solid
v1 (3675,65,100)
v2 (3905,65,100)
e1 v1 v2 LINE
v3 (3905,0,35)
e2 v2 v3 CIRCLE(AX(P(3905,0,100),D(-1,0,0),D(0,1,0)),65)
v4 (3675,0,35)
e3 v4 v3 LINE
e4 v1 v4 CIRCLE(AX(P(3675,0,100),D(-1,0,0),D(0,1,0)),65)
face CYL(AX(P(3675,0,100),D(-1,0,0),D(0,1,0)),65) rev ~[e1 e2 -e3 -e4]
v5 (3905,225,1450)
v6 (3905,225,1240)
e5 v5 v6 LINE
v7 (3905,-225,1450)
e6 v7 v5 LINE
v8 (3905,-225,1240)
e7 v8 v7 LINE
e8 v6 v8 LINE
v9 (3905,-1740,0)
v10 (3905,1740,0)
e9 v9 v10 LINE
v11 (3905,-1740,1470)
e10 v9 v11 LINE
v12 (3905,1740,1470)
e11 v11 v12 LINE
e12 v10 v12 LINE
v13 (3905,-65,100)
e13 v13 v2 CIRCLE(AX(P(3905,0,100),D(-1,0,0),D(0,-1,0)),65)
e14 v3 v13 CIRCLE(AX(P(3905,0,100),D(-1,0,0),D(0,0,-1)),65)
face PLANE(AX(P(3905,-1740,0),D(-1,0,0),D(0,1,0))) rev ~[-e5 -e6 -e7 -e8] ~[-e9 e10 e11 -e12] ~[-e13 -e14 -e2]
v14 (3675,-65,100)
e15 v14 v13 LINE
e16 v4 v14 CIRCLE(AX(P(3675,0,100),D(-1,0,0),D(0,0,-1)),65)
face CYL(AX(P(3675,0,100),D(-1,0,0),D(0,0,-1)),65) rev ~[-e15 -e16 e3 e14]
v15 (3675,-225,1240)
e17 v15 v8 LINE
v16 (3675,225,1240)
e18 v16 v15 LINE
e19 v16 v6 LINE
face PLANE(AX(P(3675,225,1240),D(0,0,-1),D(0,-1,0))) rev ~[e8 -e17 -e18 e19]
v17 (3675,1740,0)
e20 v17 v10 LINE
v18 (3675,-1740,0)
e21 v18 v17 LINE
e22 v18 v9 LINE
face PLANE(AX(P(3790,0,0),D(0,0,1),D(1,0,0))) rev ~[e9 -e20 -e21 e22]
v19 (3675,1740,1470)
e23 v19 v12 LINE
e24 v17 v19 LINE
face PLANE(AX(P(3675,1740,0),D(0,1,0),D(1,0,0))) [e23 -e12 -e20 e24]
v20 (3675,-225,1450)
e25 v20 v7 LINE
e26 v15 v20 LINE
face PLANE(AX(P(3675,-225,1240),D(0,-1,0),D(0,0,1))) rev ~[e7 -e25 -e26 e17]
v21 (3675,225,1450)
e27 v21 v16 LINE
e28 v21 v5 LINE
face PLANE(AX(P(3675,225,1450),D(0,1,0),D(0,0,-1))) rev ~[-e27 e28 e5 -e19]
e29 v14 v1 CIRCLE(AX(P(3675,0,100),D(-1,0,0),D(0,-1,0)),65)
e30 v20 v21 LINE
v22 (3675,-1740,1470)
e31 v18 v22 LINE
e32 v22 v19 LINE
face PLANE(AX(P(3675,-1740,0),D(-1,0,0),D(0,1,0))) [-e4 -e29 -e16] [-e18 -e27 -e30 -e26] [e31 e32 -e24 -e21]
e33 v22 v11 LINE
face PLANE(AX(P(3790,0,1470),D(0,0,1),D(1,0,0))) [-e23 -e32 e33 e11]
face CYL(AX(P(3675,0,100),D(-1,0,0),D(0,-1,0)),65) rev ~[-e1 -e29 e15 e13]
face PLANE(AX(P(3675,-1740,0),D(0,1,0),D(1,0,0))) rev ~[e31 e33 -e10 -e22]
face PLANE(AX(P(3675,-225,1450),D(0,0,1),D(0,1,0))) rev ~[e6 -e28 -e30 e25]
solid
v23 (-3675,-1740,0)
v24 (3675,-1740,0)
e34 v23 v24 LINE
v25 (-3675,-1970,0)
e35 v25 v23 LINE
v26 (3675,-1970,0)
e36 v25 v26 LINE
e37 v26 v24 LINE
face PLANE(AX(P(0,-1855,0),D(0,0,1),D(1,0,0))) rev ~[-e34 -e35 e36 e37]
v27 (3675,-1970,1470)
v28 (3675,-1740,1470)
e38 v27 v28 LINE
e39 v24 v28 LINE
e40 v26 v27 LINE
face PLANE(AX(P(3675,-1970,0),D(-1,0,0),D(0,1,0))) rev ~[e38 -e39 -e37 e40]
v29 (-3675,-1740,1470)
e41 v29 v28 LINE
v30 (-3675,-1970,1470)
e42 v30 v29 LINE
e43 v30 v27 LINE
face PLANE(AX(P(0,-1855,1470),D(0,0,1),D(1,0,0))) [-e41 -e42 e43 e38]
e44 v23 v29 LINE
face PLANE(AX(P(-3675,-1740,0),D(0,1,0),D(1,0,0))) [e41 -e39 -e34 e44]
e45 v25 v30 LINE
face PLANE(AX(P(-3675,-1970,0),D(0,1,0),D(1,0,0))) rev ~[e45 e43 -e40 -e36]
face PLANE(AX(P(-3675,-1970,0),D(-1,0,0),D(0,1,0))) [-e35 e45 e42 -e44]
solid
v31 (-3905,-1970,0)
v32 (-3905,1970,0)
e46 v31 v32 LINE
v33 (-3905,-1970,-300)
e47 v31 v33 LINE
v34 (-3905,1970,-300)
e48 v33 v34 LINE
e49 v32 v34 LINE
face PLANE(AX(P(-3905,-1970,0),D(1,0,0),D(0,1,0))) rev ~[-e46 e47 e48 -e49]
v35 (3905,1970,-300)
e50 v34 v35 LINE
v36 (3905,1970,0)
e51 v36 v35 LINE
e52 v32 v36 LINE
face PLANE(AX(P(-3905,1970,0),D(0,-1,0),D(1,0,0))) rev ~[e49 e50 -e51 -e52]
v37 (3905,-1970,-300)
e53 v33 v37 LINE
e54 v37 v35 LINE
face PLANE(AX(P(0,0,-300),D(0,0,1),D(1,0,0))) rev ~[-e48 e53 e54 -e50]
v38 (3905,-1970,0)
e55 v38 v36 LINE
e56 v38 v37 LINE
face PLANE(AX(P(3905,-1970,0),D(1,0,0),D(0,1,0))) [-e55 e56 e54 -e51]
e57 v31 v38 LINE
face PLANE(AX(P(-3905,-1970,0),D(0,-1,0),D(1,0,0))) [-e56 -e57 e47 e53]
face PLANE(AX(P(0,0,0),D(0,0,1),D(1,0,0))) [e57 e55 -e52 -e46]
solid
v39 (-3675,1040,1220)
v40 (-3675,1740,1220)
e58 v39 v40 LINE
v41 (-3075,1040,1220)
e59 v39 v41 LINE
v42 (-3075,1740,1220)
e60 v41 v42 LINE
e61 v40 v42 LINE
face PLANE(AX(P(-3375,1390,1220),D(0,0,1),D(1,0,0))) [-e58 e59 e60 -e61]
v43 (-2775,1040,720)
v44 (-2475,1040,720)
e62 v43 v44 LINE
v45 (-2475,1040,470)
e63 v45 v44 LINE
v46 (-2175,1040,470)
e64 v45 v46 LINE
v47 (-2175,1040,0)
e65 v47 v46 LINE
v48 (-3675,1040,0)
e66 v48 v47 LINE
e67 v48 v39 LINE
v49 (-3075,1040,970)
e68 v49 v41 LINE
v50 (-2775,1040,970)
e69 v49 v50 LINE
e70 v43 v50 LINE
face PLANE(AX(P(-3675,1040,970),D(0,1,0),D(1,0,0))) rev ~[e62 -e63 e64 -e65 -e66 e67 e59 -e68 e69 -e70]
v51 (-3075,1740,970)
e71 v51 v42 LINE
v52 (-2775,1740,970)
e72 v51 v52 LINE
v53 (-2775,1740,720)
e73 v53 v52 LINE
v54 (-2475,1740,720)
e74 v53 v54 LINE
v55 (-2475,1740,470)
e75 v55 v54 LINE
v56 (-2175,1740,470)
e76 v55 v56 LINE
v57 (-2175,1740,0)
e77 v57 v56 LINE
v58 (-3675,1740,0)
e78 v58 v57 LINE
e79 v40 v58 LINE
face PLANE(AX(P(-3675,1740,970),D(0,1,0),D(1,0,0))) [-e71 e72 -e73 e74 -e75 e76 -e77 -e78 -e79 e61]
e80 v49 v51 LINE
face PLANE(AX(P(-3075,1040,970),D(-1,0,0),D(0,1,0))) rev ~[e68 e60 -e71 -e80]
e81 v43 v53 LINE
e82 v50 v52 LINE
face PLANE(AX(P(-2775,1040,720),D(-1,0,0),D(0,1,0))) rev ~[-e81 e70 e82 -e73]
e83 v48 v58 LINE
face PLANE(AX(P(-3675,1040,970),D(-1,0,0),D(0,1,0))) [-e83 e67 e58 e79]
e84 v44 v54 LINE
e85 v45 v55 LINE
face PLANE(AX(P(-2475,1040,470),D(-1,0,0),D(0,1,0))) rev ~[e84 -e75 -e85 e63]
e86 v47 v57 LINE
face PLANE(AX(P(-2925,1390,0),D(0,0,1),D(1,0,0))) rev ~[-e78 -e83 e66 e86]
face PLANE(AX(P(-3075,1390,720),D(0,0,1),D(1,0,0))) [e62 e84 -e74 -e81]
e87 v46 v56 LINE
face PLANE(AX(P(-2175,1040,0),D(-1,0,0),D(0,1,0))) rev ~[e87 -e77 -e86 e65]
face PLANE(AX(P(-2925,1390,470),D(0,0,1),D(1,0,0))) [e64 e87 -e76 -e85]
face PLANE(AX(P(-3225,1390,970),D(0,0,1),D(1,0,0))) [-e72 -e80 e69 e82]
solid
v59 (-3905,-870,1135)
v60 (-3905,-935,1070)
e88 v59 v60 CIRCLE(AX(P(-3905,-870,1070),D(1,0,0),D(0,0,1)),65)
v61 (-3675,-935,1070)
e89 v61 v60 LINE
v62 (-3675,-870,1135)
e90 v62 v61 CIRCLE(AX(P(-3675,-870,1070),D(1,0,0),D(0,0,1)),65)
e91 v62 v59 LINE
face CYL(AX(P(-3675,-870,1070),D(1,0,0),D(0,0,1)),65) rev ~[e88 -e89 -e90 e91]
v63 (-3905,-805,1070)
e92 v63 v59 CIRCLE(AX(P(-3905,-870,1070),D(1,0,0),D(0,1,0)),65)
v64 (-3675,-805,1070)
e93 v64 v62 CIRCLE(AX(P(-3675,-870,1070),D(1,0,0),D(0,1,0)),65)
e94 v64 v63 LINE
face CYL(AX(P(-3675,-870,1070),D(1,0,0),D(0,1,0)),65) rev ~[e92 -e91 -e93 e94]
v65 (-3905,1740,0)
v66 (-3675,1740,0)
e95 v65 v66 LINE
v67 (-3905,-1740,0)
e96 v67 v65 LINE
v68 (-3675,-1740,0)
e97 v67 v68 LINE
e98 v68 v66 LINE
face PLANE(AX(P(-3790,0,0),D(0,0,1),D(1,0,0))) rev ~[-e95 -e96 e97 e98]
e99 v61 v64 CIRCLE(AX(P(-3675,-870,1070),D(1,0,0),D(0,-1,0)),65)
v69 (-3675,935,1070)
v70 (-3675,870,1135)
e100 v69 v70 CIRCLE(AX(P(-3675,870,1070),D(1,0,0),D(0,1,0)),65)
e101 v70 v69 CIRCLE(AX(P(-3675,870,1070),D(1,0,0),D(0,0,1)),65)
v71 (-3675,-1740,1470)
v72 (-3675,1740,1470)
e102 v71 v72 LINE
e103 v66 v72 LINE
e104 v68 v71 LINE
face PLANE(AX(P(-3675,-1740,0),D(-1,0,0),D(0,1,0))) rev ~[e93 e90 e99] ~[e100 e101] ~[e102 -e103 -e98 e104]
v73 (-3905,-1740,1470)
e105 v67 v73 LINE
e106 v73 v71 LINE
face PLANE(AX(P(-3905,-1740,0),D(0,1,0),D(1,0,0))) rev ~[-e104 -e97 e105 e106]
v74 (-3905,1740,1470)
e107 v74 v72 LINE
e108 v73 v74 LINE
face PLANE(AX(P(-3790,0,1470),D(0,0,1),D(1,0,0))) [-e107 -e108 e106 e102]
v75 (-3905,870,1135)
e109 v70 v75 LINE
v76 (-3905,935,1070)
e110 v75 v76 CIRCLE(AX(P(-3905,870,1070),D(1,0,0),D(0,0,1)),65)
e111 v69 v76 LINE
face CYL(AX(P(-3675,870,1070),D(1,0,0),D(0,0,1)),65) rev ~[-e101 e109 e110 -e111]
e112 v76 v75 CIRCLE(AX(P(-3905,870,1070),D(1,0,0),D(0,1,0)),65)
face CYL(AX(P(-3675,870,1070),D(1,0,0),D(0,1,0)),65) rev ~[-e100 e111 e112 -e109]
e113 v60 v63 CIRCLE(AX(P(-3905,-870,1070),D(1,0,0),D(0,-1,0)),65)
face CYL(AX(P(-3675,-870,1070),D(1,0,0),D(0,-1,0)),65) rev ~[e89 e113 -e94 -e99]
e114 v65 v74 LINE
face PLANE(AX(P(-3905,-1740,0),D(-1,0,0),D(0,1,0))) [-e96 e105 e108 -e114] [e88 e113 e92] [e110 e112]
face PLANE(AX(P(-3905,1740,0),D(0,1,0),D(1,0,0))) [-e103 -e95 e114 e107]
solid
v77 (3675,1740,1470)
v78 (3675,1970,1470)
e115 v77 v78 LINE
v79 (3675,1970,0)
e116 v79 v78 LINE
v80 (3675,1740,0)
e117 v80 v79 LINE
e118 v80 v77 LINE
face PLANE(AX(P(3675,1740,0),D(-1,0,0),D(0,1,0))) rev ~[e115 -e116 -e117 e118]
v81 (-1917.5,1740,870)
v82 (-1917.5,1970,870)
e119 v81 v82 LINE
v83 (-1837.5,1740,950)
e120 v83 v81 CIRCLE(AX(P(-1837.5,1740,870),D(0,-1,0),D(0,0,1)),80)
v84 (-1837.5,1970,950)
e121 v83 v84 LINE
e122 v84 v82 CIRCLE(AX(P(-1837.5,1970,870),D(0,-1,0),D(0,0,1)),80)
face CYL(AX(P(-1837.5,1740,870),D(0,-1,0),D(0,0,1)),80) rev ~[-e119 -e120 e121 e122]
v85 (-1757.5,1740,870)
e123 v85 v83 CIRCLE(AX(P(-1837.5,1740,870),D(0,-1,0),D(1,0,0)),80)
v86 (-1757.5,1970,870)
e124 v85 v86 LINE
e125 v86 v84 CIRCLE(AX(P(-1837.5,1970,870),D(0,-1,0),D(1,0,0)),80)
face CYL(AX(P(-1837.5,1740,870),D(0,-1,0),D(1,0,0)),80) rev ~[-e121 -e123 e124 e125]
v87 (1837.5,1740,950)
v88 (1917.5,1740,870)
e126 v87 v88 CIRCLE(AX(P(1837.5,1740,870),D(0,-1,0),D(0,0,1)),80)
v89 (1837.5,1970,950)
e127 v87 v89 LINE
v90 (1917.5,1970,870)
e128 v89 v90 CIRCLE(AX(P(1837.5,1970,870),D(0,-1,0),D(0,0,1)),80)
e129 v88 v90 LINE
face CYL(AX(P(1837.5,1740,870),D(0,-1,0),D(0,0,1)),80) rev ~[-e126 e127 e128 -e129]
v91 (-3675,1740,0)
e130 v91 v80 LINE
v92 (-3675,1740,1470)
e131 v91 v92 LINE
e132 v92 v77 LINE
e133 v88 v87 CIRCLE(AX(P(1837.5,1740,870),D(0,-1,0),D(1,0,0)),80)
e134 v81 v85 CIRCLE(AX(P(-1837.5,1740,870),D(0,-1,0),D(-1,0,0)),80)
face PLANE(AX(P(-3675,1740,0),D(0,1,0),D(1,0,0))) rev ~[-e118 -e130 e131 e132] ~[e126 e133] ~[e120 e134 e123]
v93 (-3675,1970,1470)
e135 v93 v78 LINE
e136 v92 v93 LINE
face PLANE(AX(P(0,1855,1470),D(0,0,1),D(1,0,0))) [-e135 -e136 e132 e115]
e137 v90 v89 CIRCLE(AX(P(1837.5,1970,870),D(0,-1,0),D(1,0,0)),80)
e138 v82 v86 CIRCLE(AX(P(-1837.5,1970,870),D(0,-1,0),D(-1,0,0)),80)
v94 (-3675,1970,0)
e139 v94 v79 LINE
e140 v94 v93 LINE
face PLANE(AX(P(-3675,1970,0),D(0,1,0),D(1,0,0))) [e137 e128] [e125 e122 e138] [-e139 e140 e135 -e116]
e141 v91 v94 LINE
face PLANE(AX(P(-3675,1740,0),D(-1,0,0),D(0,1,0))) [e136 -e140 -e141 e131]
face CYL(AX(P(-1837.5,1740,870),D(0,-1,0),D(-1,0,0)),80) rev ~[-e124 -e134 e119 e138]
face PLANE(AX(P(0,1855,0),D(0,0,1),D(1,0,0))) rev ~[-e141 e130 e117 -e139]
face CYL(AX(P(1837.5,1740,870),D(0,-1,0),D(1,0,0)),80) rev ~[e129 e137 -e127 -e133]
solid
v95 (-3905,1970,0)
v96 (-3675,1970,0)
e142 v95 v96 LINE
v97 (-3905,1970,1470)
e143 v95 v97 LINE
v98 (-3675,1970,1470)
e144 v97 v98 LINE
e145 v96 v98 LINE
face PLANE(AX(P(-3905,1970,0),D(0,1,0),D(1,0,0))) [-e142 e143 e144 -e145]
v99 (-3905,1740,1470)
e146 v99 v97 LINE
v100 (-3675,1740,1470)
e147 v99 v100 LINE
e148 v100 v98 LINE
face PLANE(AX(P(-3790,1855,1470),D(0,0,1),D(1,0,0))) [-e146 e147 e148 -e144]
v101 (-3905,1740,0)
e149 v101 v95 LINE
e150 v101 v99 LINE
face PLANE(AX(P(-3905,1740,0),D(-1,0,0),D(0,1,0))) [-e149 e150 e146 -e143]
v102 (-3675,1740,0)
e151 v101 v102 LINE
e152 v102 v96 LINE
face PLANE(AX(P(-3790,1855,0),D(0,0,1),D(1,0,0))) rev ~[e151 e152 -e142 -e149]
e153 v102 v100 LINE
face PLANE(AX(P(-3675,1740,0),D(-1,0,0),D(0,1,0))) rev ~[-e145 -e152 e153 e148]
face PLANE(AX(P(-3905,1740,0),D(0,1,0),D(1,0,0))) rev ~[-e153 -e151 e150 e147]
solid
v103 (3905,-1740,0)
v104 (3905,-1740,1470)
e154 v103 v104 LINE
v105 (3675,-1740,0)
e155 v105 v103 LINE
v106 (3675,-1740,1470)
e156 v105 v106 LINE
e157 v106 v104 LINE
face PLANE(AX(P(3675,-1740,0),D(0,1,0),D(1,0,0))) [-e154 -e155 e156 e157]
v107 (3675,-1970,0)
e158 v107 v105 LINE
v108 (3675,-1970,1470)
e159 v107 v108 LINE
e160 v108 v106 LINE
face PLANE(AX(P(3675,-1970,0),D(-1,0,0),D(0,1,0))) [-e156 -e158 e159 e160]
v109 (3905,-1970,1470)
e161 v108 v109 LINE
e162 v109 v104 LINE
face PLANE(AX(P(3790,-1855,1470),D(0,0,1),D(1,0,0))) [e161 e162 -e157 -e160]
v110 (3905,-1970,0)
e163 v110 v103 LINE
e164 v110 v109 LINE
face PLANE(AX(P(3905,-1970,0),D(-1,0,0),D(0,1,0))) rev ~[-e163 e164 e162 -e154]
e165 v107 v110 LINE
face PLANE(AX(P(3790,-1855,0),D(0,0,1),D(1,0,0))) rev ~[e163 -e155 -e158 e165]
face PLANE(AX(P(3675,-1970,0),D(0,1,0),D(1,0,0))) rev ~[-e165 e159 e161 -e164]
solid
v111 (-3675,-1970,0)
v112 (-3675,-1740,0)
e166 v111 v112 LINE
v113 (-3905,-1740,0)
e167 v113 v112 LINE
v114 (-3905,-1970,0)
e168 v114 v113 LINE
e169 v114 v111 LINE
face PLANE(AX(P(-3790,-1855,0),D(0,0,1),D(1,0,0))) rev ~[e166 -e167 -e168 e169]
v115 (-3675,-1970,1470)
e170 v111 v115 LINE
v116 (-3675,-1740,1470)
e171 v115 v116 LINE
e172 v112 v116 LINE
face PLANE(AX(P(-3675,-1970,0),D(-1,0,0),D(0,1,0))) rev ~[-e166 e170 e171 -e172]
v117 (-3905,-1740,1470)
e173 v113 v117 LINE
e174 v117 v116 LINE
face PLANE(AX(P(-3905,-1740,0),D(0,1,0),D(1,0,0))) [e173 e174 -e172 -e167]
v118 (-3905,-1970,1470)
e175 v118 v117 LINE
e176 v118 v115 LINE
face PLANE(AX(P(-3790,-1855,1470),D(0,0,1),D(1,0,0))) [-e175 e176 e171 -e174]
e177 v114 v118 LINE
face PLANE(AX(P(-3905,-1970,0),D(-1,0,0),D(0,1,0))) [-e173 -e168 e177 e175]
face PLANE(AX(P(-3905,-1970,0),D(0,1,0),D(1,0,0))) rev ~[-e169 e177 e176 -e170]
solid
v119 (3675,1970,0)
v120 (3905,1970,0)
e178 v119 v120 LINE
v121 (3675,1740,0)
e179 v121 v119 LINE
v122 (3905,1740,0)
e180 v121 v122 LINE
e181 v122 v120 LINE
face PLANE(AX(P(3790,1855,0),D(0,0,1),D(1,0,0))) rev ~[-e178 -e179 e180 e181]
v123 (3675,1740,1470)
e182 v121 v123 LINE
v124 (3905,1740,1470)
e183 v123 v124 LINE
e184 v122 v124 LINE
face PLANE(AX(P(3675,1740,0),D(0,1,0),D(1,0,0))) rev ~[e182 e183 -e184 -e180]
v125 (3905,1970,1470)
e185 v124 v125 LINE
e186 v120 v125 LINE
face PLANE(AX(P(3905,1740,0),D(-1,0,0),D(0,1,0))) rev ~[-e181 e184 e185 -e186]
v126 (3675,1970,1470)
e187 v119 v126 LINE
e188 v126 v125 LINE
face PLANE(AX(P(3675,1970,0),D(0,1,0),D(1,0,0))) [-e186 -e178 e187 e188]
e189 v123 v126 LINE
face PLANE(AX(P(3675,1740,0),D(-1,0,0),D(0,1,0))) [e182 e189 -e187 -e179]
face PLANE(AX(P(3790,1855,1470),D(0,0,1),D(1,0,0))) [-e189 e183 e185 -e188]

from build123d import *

# Parameters (mm, degrees)
F0_W      = 7810
F0_H      = 3940
F1_DEPTH  = 300
F2_W      = 230
F2_H      = 3480
F3_DEPTH  = 1470
F2_W_2    = 7350
F2_H_2    = 230
F4_DEPTH  = 1470
F5_W      = 1500
F5_H      = 700
F6_DEPTH  = 470
F7_W      = 1200
F7_H      = 700
F8_DEPTH  = 250
F9_W      = 900
F9_H      = 700
F10_DEPTH = 250
F11_W     = 600
F11_H     = 700
F12_DEPTH = 250
F14_DEPTH = 230
F16_DEPTH = 230
F17_W     = 225
F17_H     = 105
F18_DEPTH = 230


with BuildPart() as f1:
    # F0 (on Top) → F1 (new body)
    with BuildSketch(Plane.XY):
        Rectangle(F0_W, F0_H)
    extrude(amount=-F1_DEPTH)


with BuildPart() as f3:
    # F2 (on face) → F3 (new body)
    with BuildSketch(Plane.XY):
        with Locations((-3790, 0)):
            Rectangle(F2_W, F2_H)
    extrude(amount=F3_DEPTH)

    # F15 (on face) → F16 (cut)
    with BuildSketch(Plane.YZ.offset(-3675)):
        with BuildLine():
            Line((-870, 1070), (-870, 1135))
            ThreePointArc((-870, 1135), (-915.9619407771, 1115.9619407771), (-935, 1070))
            Line((-935, 1070), (-870, 1070))
        make_face()
        with BuildLine():
            ThreePointArc((-805, 1070), (-824.0380592229, 1115.9619407771), (-870, 1135))
            Line((-870, 1135), (-870, 1070))
            Line((-870, 1070), (-935, 1070))
            ThreePointArc((-935, 1070), (-870, 1005), (-805, 1070))
        make_face()
        with BuildLine():
            ThreePointArc((935, 1070), (915.9619407771, 1115.9619407771), (870, 1135))
            Line((870, 1135), (870, 1070))
            Line((870, 1070), (935, 1070))
        make_face()
        with BuildLine():
            Line((870, 1070), (870, 1135))
            ThreePointArc((870, 1135), (824.0380592229, 1024.0380592229), (935, 1070))
            Line((935, 1070), (870, 1070))
        make_face()
    extrude(amount=-F16_DEPTH, mode=Mode.SUBTRACT)


with BuildPart() as f3b:
    # F2 (on face) → F3, piece 2 (new body)
    with BuildSketch(Plane.XY):
        with Locations((3790, 0)):
            Rectangle(F2_W, F2_H)
    extrude(amount=F3_DEPTH)

    # F17 (on face) → F18 (cut)
    with BuildSketch(Plane(origin=(3675, 0, 0), x_dir=(0, -1, 0), z_dir=(-1, 0, 0))):
        with BuildLine():
            ThreePointArc((-65, 100), (-45.9619407771, 54.0380592229), (0, 35))
            Line((0, 35), (0, 100))
            Line((0, 100), (-65, 100))
        make_face()
        with BuildLine():
            Line((0, 100), (0, 35))
            ThreePointArc((0, 35), (45.9619407771, 54.0380592229), (65, 100))
            ThreePointArc((65, 100), (0, 165), (-65, 100))
            Line((-65, 100), (0, 100))
        make_face()
        Polygon((0, 1345), (-225, 1345), (-225, 1240), (225, 1240), (225, 1450), (0, 1450), align=None)
        with Locations((-112.5, 1397.5)):
            Rectangle(F17_W, F17_H)
    extrude(amount=-F18_DEPTH, mode=Mode.SUBTRACT)


with BuildPart() as f3c:
    # F2 (on face) → F3, piece 3 (new body)
    with BuildSketch(Plane.XY):
        with Locations((0, 1855)):
            Rectangle(F2_W_2, F2_H_2)
    extrude(amount=F3_DEPTH)

    # F13 (on face) → F14 (cut)
    with BuildSketch(Plane.XZ.offset(-1740)):
        with BuildLine():
            Line((-1837.5, 870), (-1837.5, 950))
            ThreePointArc((-1837.5, 950), (-1894.0685424949, 926.5685424949), (-1917.5, 870))
            Line((-1917.5, 870), (-1837.5, 870))
        make_face()
        with BuildLine():
            ThreePointArc((-1757.5, 870), (-1780.9314575051, 926.5685424949), (-1837.5, 950))
            Line((-1837.5, 950), (-1837.5, 870))
            Line((-1837.5, 870), (-1917.5, 870))
            ThreePointArc((-1917.5, 870), (-1837.5, 790), (-1757.5, 870))
        make_face()
        with BuildLine():
            ThreePointArc((1917.5, 870), (1894.0685424949, 926.5685424949), (1837.5, 950))
            Line((1837.5, 950), (1837.5, 870))
            Line((1837.5, 870), (1917.5, 870))
        make_face()
        with BuildLine():
            Line((1837.5, 870), (1837.5, 950))
            ThreePointArc((1837.5, 950), (1780.9314575051, 813.4314575051), (1917.5, 870))
            Line((1917.5, 870), (1837.5, 870))
        make_face()
    extrude(amount=-F14_DEPTH, mode=Mode.SUBTRACT)


with BuildPart() as f3d:
    # F2 (on face) → F3, piece 4 (new body)
    with BuildSketch(Plane.XY):
        with Locations((0, -1855)):
            Rectangle(F2_W_2, F2_H_2)
    extrude(amount=F3_DEPTH)


with BuildPart() as f4:
    # F2 (on face) → F4 (new body)
    with BuildSketch(Plane.XY):
        with Locations((-3790, -1855)):
            Rectangle(F2_W, F2_H_2)
    extrude(amount=F4_DEPTH)


with BuildPart() as f4b:
    # F2 (on face) → F4, piece 2 (new body)
    with BuildSketch(Plane.XY):
        with Locations((-3790, 1855)):
            Rectangle(F2_W, F2_H_2)
    extrude(amount=F4_DEPTH)


with BuildPart() as f4c:
    # F2 (on face) → F4, piece 3 (new body)
    with BuildSketch(Plane.XY):
        with Locations((3790, 1855)):
            Rectangle(F2_W, F2_H_2)
    extrude(amount=F4_DEPTH)


with BuildPart() as f4d:
    # F2 (on face) → F4, piece 4 (new body)
    with BuildSketch(Plane.XY):
        with Locations((3790, -1855)):
            Rectangle(F2_W, F2_H_2)
    extrude(amount=F4_DEPTH)


with BuildPart() as f6:
    # F5 (on face) → F6 (new body)
    with BuildSketch(Plane.XY):
        with Locations((-2925, 1390)):
            Rectangle(F5_W, F5_H)
    extrude(amount=F6_DEPTH)

    # F7 (on face) → F8 (join)
    with BuildSketch(Plane.XY.offset(470)):
        with Locations((-3075, 1390)):
            Rectangle(F7_W, F7_H)
    extrude(amount=F8_DEPTH)

    # F9 (on face) → F10 (join)
    with BuildSketch(Plane.XY.offset(720)):
        with Locations((-3225, 1390)):
            Rectangle(F9_W, F9_H)
    extrude(amount=F10_DEPTH)

    # F11 (on face) → F12 (join)
    with BuildSketch(Plane.XY.offset(970)):
        with Locations((-3375, 1390)):
            Rectangle(F11_W, F11_H)
    extrude(amount=F12_DEPTH)


solid = Compound([f1.part, f3.part, f3b.part, f3c.part, f3d.part, f4.part, f4b.part, f4c.part, f4d.part, f6.part])
